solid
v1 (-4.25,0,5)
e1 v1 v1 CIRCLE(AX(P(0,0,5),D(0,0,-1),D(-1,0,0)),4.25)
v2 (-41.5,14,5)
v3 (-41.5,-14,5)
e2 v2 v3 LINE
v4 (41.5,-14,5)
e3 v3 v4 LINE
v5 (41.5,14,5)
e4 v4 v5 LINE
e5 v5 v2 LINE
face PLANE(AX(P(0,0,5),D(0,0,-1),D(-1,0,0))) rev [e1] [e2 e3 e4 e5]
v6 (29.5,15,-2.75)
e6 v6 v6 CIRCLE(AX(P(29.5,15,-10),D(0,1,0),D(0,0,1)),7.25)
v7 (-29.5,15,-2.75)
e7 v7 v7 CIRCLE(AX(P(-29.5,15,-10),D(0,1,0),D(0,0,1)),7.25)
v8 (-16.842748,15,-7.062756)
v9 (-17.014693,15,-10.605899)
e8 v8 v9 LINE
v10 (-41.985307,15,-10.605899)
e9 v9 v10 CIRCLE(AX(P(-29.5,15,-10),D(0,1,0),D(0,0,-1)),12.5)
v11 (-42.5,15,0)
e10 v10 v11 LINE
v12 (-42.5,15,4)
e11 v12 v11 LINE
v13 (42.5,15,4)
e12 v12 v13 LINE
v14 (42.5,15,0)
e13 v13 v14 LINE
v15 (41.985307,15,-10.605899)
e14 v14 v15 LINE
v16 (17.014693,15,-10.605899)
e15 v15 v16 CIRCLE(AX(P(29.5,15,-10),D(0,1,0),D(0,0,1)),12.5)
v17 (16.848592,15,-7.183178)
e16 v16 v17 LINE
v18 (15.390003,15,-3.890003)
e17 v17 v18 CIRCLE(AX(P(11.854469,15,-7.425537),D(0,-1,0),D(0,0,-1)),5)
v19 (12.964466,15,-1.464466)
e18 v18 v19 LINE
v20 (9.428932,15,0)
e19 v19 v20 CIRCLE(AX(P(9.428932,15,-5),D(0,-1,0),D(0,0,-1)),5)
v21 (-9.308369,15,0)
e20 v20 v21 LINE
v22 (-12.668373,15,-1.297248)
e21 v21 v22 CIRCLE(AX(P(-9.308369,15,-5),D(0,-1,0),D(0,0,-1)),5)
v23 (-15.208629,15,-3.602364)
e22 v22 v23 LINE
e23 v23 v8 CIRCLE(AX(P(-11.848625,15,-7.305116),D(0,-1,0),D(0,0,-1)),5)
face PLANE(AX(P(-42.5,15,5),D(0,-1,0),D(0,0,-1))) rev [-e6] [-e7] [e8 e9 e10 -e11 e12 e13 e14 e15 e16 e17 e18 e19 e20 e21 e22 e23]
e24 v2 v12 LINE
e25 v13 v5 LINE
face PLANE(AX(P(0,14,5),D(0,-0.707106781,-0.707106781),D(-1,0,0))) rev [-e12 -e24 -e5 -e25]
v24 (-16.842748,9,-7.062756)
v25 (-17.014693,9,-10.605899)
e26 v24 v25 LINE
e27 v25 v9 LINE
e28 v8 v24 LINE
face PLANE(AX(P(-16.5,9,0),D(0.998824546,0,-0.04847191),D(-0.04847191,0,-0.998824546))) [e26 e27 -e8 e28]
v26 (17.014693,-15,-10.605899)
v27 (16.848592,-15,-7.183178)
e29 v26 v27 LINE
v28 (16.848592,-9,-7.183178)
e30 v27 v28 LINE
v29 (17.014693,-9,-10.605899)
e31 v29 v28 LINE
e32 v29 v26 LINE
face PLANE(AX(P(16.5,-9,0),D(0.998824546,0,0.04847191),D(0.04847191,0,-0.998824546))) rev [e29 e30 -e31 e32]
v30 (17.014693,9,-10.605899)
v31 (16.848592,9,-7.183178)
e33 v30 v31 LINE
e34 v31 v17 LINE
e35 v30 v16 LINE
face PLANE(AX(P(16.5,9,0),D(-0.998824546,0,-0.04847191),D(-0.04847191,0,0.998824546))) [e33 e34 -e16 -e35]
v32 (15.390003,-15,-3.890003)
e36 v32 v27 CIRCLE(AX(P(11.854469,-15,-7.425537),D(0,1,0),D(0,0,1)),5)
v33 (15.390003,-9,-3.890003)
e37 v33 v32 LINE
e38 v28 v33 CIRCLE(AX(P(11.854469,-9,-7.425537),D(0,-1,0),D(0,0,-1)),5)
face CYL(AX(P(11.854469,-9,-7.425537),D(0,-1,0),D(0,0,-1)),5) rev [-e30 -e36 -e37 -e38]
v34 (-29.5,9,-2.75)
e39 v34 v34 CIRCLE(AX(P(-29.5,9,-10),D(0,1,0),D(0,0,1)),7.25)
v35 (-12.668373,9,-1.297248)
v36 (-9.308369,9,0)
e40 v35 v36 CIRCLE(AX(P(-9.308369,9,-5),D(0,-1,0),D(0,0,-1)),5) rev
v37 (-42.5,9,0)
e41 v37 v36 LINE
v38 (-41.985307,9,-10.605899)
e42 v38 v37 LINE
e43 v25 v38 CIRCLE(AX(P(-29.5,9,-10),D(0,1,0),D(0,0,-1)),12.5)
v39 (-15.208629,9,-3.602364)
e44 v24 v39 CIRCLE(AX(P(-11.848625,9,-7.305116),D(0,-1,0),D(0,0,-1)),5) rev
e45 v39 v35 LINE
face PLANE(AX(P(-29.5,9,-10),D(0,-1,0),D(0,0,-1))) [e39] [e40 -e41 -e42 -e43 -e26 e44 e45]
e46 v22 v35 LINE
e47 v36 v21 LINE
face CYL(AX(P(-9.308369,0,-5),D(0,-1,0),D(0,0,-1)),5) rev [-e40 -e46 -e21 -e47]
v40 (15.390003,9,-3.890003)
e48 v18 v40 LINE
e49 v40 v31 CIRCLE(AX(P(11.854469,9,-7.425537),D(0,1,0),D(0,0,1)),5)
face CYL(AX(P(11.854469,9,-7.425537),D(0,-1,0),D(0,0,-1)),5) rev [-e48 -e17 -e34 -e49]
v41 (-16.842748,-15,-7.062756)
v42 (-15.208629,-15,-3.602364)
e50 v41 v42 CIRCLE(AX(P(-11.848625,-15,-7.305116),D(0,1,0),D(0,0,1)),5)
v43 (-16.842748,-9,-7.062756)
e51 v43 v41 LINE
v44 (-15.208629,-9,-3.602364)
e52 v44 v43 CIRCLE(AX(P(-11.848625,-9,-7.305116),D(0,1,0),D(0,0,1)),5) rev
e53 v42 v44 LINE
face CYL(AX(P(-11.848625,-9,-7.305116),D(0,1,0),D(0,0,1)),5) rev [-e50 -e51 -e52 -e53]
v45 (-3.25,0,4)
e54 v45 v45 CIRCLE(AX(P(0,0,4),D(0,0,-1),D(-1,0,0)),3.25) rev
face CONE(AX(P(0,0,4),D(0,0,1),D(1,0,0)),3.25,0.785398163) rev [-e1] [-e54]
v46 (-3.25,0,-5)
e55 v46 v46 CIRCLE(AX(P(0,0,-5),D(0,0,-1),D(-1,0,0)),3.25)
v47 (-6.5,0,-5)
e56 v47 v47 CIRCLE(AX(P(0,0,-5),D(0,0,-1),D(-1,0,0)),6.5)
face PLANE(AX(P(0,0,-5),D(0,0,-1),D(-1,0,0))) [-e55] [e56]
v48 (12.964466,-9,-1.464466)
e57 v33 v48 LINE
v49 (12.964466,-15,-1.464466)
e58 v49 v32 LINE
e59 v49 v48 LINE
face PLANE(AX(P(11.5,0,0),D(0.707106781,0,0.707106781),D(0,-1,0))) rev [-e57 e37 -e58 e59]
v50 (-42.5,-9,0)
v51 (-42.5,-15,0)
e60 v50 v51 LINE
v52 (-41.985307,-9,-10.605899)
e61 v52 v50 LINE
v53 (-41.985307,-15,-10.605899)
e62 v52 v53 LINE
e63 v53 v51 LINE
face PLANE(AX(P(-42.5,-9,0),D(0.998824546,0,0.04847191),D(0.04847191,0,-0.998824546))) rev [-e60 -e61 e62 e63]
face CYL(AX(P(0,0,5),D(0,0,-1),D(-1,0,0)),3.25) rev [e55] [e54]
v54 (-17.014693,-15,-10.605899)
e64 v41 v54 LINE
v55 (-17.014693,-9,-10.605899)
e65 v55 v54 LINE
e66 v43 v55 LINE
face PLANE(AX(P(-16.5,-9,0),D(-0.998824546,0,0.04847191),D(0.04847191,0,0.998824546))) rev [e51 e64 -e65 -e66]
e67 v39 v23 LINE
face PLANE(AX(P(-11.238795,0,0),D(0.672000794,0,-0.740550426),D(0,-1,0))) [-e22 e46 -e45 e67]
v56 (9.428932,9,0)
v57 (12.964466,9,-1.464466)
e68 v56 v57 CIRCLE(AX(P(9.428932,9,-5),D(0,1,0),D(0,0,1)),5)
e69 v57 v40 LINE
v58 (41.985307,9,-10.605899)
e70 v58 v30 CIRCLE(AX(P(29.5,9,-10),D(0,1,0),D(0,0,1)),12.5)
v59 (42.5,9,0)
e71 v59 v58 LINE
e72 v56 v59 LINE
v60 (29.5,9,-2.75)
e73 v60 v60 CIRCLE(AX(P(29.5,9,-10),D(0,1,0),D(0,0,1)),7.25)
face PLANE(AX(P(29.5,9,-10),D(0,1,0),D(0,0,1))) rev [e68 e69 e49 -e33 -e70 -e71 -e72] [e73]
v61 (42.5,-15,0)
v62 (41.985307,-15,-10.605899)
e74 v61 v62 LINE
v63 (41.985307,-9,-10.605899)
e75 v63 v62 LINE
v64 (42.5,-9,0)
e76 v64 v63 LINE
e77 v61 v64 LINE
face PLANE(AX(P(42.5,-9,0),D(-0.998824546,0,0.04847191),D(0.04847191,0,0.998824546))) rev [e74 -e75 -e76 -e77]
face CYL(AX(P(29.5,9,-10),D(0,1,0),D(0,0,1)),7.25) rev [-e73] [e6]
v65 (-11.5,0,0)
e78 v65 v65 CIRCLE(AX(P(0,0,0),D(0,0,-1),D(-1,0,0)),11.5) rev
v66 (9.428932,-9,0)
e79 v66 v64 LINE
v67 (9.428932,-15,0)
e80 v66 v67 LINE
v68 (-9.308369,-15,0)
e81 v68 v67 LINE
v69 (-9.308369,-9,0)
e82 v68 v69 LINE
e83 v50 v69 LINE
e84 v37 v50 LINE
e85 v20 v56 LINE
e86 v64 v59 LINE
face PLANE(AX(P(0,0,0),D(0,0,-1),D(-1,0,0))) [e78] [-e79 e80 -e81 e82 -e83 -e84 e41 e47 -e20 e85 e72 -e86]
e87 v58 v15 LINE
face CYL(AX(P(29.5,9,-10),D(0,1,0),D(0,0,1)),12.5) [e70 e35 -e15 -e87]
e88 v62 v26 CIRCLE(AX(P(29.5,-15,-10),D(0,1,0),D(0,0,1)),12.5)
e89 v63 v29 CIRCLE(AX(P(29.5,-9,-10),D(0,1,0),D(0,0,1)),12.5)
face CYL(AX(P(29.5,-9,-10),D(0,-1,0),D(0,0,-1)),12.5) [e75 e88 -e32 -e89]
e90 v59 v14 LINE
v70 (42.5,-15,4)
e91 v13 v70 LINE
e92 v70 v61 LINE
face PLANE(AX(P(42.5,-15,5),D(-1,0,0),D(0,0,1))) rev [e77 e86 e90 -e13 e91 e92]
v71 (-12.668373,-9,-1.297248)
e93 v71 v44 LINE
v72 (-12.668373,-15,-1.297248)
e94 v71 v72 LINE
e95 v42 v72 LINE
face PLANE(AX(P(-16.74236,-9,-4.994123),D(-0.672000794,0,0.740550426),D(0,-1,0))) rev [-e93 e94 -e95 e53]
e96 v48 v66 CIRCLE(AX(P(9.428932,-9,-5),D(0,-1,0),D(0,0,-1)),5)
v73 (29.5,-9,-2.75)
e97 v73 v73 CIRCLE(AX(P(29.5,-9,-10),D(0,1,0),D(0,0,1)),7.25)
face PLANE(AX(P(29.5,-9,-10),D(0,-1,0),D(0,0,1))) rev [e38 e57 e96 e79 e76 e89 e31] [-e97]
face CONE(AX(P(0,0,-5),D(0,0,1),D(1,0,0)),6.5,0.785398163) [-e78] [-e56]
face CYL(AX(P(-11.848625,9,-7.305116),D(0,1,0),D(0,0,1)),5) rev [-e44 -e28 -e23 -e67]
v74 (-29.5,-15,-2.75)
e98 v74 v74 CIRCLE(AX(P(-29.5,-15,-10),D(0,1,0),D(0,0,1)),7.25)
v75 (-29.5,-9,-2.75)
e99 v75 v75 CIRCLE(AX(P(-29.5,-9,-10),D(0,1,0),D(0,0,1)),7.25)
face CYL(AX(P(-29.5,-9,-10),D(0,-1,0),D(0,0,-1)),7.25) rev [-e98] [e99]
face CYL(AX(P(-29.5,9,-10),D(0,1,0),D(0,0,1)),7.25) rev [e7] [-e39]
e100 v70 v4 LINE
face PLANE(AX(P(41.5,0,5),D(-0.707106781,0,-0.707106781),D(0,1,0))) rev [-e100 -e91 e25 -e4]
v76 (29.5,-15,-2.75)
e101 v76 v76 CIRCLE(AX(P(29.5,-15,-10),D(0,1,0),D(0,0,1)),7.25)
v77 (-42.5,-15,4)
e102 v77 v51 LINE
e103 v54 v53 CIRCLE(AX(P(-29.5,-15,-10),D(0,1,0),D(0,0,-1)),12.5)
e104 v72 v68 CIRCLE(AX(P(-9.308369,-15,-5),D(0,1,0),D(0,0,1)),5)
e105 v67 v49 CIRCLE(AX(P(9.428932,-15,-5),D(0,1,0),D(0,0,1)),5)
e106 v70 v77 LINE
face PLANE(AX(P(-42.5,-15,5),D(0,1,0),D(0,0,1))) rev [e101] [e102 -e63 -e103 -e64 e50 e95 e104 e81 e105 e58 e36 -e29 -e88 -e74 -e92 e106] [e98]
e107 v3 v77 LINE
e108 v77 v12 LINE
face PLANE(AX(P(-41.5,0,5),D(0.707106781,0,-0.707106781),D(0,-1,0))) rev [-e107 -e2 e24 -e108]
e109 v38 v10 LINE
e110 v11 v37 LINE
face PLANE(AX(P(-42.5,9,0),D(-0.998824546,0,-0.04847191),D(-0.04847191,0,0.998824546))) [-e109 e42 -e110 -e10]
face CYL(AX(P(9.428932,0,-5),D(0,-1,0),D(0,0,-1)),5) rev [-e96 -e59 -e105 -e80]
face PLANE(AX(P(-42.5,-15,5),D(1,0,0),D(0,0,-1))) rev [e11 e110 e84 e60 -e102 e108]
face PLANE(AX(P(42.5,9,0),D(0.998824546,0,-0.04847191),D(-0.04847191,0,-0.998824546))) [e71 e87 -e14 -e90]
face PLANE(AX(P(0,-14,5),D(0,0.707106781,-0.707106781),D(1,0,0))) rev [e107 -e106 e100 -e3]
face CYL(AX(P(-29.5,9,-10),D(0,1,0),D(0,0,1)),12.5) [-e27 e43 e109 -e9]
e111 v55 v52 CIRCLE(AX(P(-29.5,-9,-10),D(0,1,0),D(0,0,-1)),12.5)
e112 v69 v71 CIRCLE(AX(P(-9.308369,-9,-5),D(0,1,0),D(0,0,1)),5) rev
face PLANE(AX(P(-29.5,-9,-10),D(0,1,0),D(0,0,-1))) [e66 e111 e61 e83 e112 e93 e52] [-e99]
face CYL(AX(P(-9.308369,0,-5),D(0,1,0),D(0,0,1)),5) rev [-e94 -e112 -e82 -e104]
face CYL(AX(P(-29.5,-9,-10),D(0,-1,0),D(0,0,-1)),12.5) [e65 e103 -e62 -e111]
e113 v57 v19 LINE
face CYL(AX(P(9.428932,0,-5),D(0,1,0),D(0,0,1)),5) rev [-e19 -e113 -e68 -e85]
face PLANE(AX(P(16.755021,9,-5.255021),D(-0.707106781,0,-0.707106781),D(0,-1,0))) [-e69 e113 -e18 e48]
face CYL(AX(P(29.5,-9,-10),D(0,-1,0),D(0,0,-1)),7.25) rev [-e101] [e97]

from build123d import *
from OCP.BRepFilletAPI import BRepFilletAPI_MakeChamfer
from build123d.topology import SkipClean

# Parameters (mm, degrees)
SKETCH1_W                 = 85
SKETCH1_H                 = 30
SKETCH1_R                 = 3.25
BOSS_EXTRUDE1_DEPTH       = 5
SKETCH3_R                 = 7.25
BOSS_EXTRUDE2_DEPTH       = 6
CHAMFER2_SIZE             = 5
CHAMFER2_SIZE2            = 5.261204957
FILLET1_R                 = 5
CHAMFER2_OF_MIRROR1_SIZE  = 5
CHAMFER2_OF_MIRROR1_SIZE2 = 5.261204957
FILLET1_OF_MIRROR1_R      = 5
BOSS_EXTRUDE3_START       = 5
SKETCH5_R                 = 6.5
SKETCH5_R_2               = 3.25
BOSS_EXTRUDE3_DEPTH       = 5
CHAMFER1_SIZE             = 5
CHAMFER3_SIZE             = 1


with BuildPart() as part:
    # Sketch1 → Boss-Extrude1 (new body)
    with BuildSketch(Plane.XY):
        Rectangle(SKETCH1_W, SKETCH1_H)
        Circle(SKETCH1_R, mode=Mode.SUBTRACT)
    extrude(amount=BOSS_EXTRUDE1_DEPTH)

    # Sketch3 → Boss-Extrude2 (add)
    # profile 1 of 2: a face of its own
    with BuildSketch(Plane(origin=(0, 15, 0), x_dir=(1, 0, 0), z_dir=(0, 1, 0))):
        with BuildLine():
            Line((42.5, 0), (41.985306827, 10.605898875))
            ThreePointArc((41.985306827, 10.605898875), (29.5, 22.5), (17.014693173, 10.605898875))
            Line((17.014693173, 10.605898875), (16.5, 0))
            Line((16.5, 0), (42.5, 0))
        make_face()
        with Locations(Location((29.5, 10, 0), (0, 0, 270))):
            Circle(SKETCH3_R, mode=Mode.SUBTRACT)
    # profile 2 of 2: a face of its own
    with BuildSketch(Plane(origin=(0, 15, 0), x_dir=(1, 0, 0), z_dir=(0, 1, 0))):
        with BuildLine():
            Line((-42.5, 0), (-41.985306827, 10.605898875))
            ThreePointArc((-41.985306827, 10.605898875), (-29.5, 22.5), (-17.014693173, 10.605898875))
            Line((-17.014693173, 10.605898875), (-16.5, 0))
            Line((-16.5, 0), (-42.5, 0))
        make_face()
        with Locations(Location((-29.5, 10, 0), (0, 0, 270))):
            Circle(SKETCH3_R, mode=Mode.SUBTRACT)
    boss_extrude2 = extrude(amount=-BOSS_EXTRUDE2_DEPTH)

    # Chamfer2: one chamfer whose edges measure the first distance from different faces: ONE call of the kernel's chamfer builder (chamfer() names one face for all edges)
    chamfer2_edges_1 = [part.edges().sort_by_distance(p)[0] for p in [
        (16.5, 12, 0),
    ]]
    chamfer2_side_1 = [part.faces().sort_by_distance(p)[0] for p in [
        (-41.598612181, -3, 0),
    ]]
    chamfer2_edges_2 = [part.edges().sort_by_distance(p)[0] for p in [
        (-16.5, 12, 0),
    ]]
    chamfer2_side_2 = [part.faces().sort_by_distance(p)[0] for p in [
        (-16.757346587, 12, -5.302949437),
    ]]
    chamfer2 = BRepFilletAPI_MakeChamfer(part.part.solid().wrapped)
    for e in chamfer2_edges_1:
        chamfer2.Add(CHAMFER2_SIZE, CHAMFER2_SIZE2, e.wrapped, chamfer2_side_1[0].wrapped)  # the first distance lies on this face
    for e in chamfer2_edges_2:
        chamfer2.Add(CHAMFER2_SIZE, CHAMFER2_SIZE2, e.wrapped, chamfer2_side_2[0].wrapped)  # the first distance lies on this face
    add(Compound.cast(chamfer2.Shape()), mode=Mode.REPLACE)

    # Fillet1
    fillet1_edges = [part.edges().sort_by_distance(p)[0] for p in [
        (11.5, 12, 0),
        (-11.238795043, 12, 0),
        (-16.74235955, 12, -4.994122731),
        (16.755020653, 12, -5.255020653),
    ]]
    fillet(fillet1_edges, radius=FILLET1_R)

    # Mirror1: Boss-Extrude2 across plane
    add(boss_extrude2.mirror(Plane.ZX))

    # Chamfer2 of Mirror1: one chamfer whose edges measure the first distance from different faces: ONE call of the kernel's chamfer builder (chamfer() names one face for all edges)
    chamfer2_of_mirror1_edges_1 = [part.edges().sort_by_distance(p)[0] for p in [
        (16.5, -12, 0),
    ]]
    chamfer2_of_mirror1_side_1 = [part.faces().sort_by_distance(p)[0] for p in [
        (-41.598612181, 3, 0),
    ]]
    chamfer2_of_mirror1_edges_2 = [part.edges().sort_by_distance(p)[0] for p in [
        (-16.5, -12, 0),
    ]]
    chamfer2_of_mirror1_side_2 = [part.faces().sort_by_distance(p)[0] for p in [
        (-16.757346587, -12, -5.302949437),
    ]]
    chamfer2_of_mirror1 = BRepFilletAPI_MakeChamfer(part.part.solid().wrapped)
    for e in chamfer2_of_mirror1_edges_1:
        chamfer2_of_mirror1.Add(CHAMFER2_OF_MIRROR1_SIZE, CHAMFER2_OF_MIRROR1_SIZE2, e.wrapped, chamfer2_of_mirror1_side_1[0].wrapped)  # the first distance lies on this face
    for e in chamfer2_of_mirror1_edges_2:
        chamfer2_of_mirror1.Add(CHAMFER2_OF_MIRROR1_SIZE, CHAMFER2_OF_MIRROR1_SIZE2, e.wrapped, chamfer2_of_mirror1_side_2[0].wrapped)  # the first distance lies on this face
    add(Compound.cast(chamfer2_of_mirror1.Shape()), mode=Mode.REPLACE)

    # Fillet1 of Mirror1
    fillet1_of_mirror1_edges = [part.edges().sort_by_distance(p)[0] for p in [
        (11.5, -12, 0),
        (-11.238795043, -12, 0),
        (-16.74235955, -12, -4.994122731),
        (16.755020653, -12, -5.255020653),
    ]]
    fillet(fillet1_of_mirror1_edges, radius=FILLET1_OF_MIRROR1_R)

    # Sketch5 → Boss-Extrude3 (add)
    with SkipClean():  # the faces are left unmerged after this step: merging them gives an invalid solid
        with BuildSketch(Plane(origin=(0, 0, 0), x_dir=(-1, 0, 0), z_dir=(0, 0, -1)).offset(BOSS_EXTRUDE3_START)):
            Circle(SKETCH5_R)
            Circle(SKETCH5_R_2, mode=Mode.SUBTRACT)
        extrude(amount=-BOSS_EXTRUDE3_DEPTH)

    # Chamfer1
    chamfer1_edges = [part.edges().sort_by_distance(p)[0] for p in [
        (6.5, 0, 0),
    ]]
    chamfer(chamfer1_edges, length=CHAMFER1_SIZE - 0.0001)  # a hair under: the kernel refuses the full size

    # Chamfer3
    chamfer3_edges = [part.edges().sort_by_distance(p)[0] for p in [
        (-42.5, 0, 5),
        (-3.25, 0, 5),
        (0, -15, 5),
        (42.5, 0, 5),
        (0, 15, 5),
    ]]
    chamfer(chamfer3_edges, length=CHAMFER3_SIZE)


solid = part.part
